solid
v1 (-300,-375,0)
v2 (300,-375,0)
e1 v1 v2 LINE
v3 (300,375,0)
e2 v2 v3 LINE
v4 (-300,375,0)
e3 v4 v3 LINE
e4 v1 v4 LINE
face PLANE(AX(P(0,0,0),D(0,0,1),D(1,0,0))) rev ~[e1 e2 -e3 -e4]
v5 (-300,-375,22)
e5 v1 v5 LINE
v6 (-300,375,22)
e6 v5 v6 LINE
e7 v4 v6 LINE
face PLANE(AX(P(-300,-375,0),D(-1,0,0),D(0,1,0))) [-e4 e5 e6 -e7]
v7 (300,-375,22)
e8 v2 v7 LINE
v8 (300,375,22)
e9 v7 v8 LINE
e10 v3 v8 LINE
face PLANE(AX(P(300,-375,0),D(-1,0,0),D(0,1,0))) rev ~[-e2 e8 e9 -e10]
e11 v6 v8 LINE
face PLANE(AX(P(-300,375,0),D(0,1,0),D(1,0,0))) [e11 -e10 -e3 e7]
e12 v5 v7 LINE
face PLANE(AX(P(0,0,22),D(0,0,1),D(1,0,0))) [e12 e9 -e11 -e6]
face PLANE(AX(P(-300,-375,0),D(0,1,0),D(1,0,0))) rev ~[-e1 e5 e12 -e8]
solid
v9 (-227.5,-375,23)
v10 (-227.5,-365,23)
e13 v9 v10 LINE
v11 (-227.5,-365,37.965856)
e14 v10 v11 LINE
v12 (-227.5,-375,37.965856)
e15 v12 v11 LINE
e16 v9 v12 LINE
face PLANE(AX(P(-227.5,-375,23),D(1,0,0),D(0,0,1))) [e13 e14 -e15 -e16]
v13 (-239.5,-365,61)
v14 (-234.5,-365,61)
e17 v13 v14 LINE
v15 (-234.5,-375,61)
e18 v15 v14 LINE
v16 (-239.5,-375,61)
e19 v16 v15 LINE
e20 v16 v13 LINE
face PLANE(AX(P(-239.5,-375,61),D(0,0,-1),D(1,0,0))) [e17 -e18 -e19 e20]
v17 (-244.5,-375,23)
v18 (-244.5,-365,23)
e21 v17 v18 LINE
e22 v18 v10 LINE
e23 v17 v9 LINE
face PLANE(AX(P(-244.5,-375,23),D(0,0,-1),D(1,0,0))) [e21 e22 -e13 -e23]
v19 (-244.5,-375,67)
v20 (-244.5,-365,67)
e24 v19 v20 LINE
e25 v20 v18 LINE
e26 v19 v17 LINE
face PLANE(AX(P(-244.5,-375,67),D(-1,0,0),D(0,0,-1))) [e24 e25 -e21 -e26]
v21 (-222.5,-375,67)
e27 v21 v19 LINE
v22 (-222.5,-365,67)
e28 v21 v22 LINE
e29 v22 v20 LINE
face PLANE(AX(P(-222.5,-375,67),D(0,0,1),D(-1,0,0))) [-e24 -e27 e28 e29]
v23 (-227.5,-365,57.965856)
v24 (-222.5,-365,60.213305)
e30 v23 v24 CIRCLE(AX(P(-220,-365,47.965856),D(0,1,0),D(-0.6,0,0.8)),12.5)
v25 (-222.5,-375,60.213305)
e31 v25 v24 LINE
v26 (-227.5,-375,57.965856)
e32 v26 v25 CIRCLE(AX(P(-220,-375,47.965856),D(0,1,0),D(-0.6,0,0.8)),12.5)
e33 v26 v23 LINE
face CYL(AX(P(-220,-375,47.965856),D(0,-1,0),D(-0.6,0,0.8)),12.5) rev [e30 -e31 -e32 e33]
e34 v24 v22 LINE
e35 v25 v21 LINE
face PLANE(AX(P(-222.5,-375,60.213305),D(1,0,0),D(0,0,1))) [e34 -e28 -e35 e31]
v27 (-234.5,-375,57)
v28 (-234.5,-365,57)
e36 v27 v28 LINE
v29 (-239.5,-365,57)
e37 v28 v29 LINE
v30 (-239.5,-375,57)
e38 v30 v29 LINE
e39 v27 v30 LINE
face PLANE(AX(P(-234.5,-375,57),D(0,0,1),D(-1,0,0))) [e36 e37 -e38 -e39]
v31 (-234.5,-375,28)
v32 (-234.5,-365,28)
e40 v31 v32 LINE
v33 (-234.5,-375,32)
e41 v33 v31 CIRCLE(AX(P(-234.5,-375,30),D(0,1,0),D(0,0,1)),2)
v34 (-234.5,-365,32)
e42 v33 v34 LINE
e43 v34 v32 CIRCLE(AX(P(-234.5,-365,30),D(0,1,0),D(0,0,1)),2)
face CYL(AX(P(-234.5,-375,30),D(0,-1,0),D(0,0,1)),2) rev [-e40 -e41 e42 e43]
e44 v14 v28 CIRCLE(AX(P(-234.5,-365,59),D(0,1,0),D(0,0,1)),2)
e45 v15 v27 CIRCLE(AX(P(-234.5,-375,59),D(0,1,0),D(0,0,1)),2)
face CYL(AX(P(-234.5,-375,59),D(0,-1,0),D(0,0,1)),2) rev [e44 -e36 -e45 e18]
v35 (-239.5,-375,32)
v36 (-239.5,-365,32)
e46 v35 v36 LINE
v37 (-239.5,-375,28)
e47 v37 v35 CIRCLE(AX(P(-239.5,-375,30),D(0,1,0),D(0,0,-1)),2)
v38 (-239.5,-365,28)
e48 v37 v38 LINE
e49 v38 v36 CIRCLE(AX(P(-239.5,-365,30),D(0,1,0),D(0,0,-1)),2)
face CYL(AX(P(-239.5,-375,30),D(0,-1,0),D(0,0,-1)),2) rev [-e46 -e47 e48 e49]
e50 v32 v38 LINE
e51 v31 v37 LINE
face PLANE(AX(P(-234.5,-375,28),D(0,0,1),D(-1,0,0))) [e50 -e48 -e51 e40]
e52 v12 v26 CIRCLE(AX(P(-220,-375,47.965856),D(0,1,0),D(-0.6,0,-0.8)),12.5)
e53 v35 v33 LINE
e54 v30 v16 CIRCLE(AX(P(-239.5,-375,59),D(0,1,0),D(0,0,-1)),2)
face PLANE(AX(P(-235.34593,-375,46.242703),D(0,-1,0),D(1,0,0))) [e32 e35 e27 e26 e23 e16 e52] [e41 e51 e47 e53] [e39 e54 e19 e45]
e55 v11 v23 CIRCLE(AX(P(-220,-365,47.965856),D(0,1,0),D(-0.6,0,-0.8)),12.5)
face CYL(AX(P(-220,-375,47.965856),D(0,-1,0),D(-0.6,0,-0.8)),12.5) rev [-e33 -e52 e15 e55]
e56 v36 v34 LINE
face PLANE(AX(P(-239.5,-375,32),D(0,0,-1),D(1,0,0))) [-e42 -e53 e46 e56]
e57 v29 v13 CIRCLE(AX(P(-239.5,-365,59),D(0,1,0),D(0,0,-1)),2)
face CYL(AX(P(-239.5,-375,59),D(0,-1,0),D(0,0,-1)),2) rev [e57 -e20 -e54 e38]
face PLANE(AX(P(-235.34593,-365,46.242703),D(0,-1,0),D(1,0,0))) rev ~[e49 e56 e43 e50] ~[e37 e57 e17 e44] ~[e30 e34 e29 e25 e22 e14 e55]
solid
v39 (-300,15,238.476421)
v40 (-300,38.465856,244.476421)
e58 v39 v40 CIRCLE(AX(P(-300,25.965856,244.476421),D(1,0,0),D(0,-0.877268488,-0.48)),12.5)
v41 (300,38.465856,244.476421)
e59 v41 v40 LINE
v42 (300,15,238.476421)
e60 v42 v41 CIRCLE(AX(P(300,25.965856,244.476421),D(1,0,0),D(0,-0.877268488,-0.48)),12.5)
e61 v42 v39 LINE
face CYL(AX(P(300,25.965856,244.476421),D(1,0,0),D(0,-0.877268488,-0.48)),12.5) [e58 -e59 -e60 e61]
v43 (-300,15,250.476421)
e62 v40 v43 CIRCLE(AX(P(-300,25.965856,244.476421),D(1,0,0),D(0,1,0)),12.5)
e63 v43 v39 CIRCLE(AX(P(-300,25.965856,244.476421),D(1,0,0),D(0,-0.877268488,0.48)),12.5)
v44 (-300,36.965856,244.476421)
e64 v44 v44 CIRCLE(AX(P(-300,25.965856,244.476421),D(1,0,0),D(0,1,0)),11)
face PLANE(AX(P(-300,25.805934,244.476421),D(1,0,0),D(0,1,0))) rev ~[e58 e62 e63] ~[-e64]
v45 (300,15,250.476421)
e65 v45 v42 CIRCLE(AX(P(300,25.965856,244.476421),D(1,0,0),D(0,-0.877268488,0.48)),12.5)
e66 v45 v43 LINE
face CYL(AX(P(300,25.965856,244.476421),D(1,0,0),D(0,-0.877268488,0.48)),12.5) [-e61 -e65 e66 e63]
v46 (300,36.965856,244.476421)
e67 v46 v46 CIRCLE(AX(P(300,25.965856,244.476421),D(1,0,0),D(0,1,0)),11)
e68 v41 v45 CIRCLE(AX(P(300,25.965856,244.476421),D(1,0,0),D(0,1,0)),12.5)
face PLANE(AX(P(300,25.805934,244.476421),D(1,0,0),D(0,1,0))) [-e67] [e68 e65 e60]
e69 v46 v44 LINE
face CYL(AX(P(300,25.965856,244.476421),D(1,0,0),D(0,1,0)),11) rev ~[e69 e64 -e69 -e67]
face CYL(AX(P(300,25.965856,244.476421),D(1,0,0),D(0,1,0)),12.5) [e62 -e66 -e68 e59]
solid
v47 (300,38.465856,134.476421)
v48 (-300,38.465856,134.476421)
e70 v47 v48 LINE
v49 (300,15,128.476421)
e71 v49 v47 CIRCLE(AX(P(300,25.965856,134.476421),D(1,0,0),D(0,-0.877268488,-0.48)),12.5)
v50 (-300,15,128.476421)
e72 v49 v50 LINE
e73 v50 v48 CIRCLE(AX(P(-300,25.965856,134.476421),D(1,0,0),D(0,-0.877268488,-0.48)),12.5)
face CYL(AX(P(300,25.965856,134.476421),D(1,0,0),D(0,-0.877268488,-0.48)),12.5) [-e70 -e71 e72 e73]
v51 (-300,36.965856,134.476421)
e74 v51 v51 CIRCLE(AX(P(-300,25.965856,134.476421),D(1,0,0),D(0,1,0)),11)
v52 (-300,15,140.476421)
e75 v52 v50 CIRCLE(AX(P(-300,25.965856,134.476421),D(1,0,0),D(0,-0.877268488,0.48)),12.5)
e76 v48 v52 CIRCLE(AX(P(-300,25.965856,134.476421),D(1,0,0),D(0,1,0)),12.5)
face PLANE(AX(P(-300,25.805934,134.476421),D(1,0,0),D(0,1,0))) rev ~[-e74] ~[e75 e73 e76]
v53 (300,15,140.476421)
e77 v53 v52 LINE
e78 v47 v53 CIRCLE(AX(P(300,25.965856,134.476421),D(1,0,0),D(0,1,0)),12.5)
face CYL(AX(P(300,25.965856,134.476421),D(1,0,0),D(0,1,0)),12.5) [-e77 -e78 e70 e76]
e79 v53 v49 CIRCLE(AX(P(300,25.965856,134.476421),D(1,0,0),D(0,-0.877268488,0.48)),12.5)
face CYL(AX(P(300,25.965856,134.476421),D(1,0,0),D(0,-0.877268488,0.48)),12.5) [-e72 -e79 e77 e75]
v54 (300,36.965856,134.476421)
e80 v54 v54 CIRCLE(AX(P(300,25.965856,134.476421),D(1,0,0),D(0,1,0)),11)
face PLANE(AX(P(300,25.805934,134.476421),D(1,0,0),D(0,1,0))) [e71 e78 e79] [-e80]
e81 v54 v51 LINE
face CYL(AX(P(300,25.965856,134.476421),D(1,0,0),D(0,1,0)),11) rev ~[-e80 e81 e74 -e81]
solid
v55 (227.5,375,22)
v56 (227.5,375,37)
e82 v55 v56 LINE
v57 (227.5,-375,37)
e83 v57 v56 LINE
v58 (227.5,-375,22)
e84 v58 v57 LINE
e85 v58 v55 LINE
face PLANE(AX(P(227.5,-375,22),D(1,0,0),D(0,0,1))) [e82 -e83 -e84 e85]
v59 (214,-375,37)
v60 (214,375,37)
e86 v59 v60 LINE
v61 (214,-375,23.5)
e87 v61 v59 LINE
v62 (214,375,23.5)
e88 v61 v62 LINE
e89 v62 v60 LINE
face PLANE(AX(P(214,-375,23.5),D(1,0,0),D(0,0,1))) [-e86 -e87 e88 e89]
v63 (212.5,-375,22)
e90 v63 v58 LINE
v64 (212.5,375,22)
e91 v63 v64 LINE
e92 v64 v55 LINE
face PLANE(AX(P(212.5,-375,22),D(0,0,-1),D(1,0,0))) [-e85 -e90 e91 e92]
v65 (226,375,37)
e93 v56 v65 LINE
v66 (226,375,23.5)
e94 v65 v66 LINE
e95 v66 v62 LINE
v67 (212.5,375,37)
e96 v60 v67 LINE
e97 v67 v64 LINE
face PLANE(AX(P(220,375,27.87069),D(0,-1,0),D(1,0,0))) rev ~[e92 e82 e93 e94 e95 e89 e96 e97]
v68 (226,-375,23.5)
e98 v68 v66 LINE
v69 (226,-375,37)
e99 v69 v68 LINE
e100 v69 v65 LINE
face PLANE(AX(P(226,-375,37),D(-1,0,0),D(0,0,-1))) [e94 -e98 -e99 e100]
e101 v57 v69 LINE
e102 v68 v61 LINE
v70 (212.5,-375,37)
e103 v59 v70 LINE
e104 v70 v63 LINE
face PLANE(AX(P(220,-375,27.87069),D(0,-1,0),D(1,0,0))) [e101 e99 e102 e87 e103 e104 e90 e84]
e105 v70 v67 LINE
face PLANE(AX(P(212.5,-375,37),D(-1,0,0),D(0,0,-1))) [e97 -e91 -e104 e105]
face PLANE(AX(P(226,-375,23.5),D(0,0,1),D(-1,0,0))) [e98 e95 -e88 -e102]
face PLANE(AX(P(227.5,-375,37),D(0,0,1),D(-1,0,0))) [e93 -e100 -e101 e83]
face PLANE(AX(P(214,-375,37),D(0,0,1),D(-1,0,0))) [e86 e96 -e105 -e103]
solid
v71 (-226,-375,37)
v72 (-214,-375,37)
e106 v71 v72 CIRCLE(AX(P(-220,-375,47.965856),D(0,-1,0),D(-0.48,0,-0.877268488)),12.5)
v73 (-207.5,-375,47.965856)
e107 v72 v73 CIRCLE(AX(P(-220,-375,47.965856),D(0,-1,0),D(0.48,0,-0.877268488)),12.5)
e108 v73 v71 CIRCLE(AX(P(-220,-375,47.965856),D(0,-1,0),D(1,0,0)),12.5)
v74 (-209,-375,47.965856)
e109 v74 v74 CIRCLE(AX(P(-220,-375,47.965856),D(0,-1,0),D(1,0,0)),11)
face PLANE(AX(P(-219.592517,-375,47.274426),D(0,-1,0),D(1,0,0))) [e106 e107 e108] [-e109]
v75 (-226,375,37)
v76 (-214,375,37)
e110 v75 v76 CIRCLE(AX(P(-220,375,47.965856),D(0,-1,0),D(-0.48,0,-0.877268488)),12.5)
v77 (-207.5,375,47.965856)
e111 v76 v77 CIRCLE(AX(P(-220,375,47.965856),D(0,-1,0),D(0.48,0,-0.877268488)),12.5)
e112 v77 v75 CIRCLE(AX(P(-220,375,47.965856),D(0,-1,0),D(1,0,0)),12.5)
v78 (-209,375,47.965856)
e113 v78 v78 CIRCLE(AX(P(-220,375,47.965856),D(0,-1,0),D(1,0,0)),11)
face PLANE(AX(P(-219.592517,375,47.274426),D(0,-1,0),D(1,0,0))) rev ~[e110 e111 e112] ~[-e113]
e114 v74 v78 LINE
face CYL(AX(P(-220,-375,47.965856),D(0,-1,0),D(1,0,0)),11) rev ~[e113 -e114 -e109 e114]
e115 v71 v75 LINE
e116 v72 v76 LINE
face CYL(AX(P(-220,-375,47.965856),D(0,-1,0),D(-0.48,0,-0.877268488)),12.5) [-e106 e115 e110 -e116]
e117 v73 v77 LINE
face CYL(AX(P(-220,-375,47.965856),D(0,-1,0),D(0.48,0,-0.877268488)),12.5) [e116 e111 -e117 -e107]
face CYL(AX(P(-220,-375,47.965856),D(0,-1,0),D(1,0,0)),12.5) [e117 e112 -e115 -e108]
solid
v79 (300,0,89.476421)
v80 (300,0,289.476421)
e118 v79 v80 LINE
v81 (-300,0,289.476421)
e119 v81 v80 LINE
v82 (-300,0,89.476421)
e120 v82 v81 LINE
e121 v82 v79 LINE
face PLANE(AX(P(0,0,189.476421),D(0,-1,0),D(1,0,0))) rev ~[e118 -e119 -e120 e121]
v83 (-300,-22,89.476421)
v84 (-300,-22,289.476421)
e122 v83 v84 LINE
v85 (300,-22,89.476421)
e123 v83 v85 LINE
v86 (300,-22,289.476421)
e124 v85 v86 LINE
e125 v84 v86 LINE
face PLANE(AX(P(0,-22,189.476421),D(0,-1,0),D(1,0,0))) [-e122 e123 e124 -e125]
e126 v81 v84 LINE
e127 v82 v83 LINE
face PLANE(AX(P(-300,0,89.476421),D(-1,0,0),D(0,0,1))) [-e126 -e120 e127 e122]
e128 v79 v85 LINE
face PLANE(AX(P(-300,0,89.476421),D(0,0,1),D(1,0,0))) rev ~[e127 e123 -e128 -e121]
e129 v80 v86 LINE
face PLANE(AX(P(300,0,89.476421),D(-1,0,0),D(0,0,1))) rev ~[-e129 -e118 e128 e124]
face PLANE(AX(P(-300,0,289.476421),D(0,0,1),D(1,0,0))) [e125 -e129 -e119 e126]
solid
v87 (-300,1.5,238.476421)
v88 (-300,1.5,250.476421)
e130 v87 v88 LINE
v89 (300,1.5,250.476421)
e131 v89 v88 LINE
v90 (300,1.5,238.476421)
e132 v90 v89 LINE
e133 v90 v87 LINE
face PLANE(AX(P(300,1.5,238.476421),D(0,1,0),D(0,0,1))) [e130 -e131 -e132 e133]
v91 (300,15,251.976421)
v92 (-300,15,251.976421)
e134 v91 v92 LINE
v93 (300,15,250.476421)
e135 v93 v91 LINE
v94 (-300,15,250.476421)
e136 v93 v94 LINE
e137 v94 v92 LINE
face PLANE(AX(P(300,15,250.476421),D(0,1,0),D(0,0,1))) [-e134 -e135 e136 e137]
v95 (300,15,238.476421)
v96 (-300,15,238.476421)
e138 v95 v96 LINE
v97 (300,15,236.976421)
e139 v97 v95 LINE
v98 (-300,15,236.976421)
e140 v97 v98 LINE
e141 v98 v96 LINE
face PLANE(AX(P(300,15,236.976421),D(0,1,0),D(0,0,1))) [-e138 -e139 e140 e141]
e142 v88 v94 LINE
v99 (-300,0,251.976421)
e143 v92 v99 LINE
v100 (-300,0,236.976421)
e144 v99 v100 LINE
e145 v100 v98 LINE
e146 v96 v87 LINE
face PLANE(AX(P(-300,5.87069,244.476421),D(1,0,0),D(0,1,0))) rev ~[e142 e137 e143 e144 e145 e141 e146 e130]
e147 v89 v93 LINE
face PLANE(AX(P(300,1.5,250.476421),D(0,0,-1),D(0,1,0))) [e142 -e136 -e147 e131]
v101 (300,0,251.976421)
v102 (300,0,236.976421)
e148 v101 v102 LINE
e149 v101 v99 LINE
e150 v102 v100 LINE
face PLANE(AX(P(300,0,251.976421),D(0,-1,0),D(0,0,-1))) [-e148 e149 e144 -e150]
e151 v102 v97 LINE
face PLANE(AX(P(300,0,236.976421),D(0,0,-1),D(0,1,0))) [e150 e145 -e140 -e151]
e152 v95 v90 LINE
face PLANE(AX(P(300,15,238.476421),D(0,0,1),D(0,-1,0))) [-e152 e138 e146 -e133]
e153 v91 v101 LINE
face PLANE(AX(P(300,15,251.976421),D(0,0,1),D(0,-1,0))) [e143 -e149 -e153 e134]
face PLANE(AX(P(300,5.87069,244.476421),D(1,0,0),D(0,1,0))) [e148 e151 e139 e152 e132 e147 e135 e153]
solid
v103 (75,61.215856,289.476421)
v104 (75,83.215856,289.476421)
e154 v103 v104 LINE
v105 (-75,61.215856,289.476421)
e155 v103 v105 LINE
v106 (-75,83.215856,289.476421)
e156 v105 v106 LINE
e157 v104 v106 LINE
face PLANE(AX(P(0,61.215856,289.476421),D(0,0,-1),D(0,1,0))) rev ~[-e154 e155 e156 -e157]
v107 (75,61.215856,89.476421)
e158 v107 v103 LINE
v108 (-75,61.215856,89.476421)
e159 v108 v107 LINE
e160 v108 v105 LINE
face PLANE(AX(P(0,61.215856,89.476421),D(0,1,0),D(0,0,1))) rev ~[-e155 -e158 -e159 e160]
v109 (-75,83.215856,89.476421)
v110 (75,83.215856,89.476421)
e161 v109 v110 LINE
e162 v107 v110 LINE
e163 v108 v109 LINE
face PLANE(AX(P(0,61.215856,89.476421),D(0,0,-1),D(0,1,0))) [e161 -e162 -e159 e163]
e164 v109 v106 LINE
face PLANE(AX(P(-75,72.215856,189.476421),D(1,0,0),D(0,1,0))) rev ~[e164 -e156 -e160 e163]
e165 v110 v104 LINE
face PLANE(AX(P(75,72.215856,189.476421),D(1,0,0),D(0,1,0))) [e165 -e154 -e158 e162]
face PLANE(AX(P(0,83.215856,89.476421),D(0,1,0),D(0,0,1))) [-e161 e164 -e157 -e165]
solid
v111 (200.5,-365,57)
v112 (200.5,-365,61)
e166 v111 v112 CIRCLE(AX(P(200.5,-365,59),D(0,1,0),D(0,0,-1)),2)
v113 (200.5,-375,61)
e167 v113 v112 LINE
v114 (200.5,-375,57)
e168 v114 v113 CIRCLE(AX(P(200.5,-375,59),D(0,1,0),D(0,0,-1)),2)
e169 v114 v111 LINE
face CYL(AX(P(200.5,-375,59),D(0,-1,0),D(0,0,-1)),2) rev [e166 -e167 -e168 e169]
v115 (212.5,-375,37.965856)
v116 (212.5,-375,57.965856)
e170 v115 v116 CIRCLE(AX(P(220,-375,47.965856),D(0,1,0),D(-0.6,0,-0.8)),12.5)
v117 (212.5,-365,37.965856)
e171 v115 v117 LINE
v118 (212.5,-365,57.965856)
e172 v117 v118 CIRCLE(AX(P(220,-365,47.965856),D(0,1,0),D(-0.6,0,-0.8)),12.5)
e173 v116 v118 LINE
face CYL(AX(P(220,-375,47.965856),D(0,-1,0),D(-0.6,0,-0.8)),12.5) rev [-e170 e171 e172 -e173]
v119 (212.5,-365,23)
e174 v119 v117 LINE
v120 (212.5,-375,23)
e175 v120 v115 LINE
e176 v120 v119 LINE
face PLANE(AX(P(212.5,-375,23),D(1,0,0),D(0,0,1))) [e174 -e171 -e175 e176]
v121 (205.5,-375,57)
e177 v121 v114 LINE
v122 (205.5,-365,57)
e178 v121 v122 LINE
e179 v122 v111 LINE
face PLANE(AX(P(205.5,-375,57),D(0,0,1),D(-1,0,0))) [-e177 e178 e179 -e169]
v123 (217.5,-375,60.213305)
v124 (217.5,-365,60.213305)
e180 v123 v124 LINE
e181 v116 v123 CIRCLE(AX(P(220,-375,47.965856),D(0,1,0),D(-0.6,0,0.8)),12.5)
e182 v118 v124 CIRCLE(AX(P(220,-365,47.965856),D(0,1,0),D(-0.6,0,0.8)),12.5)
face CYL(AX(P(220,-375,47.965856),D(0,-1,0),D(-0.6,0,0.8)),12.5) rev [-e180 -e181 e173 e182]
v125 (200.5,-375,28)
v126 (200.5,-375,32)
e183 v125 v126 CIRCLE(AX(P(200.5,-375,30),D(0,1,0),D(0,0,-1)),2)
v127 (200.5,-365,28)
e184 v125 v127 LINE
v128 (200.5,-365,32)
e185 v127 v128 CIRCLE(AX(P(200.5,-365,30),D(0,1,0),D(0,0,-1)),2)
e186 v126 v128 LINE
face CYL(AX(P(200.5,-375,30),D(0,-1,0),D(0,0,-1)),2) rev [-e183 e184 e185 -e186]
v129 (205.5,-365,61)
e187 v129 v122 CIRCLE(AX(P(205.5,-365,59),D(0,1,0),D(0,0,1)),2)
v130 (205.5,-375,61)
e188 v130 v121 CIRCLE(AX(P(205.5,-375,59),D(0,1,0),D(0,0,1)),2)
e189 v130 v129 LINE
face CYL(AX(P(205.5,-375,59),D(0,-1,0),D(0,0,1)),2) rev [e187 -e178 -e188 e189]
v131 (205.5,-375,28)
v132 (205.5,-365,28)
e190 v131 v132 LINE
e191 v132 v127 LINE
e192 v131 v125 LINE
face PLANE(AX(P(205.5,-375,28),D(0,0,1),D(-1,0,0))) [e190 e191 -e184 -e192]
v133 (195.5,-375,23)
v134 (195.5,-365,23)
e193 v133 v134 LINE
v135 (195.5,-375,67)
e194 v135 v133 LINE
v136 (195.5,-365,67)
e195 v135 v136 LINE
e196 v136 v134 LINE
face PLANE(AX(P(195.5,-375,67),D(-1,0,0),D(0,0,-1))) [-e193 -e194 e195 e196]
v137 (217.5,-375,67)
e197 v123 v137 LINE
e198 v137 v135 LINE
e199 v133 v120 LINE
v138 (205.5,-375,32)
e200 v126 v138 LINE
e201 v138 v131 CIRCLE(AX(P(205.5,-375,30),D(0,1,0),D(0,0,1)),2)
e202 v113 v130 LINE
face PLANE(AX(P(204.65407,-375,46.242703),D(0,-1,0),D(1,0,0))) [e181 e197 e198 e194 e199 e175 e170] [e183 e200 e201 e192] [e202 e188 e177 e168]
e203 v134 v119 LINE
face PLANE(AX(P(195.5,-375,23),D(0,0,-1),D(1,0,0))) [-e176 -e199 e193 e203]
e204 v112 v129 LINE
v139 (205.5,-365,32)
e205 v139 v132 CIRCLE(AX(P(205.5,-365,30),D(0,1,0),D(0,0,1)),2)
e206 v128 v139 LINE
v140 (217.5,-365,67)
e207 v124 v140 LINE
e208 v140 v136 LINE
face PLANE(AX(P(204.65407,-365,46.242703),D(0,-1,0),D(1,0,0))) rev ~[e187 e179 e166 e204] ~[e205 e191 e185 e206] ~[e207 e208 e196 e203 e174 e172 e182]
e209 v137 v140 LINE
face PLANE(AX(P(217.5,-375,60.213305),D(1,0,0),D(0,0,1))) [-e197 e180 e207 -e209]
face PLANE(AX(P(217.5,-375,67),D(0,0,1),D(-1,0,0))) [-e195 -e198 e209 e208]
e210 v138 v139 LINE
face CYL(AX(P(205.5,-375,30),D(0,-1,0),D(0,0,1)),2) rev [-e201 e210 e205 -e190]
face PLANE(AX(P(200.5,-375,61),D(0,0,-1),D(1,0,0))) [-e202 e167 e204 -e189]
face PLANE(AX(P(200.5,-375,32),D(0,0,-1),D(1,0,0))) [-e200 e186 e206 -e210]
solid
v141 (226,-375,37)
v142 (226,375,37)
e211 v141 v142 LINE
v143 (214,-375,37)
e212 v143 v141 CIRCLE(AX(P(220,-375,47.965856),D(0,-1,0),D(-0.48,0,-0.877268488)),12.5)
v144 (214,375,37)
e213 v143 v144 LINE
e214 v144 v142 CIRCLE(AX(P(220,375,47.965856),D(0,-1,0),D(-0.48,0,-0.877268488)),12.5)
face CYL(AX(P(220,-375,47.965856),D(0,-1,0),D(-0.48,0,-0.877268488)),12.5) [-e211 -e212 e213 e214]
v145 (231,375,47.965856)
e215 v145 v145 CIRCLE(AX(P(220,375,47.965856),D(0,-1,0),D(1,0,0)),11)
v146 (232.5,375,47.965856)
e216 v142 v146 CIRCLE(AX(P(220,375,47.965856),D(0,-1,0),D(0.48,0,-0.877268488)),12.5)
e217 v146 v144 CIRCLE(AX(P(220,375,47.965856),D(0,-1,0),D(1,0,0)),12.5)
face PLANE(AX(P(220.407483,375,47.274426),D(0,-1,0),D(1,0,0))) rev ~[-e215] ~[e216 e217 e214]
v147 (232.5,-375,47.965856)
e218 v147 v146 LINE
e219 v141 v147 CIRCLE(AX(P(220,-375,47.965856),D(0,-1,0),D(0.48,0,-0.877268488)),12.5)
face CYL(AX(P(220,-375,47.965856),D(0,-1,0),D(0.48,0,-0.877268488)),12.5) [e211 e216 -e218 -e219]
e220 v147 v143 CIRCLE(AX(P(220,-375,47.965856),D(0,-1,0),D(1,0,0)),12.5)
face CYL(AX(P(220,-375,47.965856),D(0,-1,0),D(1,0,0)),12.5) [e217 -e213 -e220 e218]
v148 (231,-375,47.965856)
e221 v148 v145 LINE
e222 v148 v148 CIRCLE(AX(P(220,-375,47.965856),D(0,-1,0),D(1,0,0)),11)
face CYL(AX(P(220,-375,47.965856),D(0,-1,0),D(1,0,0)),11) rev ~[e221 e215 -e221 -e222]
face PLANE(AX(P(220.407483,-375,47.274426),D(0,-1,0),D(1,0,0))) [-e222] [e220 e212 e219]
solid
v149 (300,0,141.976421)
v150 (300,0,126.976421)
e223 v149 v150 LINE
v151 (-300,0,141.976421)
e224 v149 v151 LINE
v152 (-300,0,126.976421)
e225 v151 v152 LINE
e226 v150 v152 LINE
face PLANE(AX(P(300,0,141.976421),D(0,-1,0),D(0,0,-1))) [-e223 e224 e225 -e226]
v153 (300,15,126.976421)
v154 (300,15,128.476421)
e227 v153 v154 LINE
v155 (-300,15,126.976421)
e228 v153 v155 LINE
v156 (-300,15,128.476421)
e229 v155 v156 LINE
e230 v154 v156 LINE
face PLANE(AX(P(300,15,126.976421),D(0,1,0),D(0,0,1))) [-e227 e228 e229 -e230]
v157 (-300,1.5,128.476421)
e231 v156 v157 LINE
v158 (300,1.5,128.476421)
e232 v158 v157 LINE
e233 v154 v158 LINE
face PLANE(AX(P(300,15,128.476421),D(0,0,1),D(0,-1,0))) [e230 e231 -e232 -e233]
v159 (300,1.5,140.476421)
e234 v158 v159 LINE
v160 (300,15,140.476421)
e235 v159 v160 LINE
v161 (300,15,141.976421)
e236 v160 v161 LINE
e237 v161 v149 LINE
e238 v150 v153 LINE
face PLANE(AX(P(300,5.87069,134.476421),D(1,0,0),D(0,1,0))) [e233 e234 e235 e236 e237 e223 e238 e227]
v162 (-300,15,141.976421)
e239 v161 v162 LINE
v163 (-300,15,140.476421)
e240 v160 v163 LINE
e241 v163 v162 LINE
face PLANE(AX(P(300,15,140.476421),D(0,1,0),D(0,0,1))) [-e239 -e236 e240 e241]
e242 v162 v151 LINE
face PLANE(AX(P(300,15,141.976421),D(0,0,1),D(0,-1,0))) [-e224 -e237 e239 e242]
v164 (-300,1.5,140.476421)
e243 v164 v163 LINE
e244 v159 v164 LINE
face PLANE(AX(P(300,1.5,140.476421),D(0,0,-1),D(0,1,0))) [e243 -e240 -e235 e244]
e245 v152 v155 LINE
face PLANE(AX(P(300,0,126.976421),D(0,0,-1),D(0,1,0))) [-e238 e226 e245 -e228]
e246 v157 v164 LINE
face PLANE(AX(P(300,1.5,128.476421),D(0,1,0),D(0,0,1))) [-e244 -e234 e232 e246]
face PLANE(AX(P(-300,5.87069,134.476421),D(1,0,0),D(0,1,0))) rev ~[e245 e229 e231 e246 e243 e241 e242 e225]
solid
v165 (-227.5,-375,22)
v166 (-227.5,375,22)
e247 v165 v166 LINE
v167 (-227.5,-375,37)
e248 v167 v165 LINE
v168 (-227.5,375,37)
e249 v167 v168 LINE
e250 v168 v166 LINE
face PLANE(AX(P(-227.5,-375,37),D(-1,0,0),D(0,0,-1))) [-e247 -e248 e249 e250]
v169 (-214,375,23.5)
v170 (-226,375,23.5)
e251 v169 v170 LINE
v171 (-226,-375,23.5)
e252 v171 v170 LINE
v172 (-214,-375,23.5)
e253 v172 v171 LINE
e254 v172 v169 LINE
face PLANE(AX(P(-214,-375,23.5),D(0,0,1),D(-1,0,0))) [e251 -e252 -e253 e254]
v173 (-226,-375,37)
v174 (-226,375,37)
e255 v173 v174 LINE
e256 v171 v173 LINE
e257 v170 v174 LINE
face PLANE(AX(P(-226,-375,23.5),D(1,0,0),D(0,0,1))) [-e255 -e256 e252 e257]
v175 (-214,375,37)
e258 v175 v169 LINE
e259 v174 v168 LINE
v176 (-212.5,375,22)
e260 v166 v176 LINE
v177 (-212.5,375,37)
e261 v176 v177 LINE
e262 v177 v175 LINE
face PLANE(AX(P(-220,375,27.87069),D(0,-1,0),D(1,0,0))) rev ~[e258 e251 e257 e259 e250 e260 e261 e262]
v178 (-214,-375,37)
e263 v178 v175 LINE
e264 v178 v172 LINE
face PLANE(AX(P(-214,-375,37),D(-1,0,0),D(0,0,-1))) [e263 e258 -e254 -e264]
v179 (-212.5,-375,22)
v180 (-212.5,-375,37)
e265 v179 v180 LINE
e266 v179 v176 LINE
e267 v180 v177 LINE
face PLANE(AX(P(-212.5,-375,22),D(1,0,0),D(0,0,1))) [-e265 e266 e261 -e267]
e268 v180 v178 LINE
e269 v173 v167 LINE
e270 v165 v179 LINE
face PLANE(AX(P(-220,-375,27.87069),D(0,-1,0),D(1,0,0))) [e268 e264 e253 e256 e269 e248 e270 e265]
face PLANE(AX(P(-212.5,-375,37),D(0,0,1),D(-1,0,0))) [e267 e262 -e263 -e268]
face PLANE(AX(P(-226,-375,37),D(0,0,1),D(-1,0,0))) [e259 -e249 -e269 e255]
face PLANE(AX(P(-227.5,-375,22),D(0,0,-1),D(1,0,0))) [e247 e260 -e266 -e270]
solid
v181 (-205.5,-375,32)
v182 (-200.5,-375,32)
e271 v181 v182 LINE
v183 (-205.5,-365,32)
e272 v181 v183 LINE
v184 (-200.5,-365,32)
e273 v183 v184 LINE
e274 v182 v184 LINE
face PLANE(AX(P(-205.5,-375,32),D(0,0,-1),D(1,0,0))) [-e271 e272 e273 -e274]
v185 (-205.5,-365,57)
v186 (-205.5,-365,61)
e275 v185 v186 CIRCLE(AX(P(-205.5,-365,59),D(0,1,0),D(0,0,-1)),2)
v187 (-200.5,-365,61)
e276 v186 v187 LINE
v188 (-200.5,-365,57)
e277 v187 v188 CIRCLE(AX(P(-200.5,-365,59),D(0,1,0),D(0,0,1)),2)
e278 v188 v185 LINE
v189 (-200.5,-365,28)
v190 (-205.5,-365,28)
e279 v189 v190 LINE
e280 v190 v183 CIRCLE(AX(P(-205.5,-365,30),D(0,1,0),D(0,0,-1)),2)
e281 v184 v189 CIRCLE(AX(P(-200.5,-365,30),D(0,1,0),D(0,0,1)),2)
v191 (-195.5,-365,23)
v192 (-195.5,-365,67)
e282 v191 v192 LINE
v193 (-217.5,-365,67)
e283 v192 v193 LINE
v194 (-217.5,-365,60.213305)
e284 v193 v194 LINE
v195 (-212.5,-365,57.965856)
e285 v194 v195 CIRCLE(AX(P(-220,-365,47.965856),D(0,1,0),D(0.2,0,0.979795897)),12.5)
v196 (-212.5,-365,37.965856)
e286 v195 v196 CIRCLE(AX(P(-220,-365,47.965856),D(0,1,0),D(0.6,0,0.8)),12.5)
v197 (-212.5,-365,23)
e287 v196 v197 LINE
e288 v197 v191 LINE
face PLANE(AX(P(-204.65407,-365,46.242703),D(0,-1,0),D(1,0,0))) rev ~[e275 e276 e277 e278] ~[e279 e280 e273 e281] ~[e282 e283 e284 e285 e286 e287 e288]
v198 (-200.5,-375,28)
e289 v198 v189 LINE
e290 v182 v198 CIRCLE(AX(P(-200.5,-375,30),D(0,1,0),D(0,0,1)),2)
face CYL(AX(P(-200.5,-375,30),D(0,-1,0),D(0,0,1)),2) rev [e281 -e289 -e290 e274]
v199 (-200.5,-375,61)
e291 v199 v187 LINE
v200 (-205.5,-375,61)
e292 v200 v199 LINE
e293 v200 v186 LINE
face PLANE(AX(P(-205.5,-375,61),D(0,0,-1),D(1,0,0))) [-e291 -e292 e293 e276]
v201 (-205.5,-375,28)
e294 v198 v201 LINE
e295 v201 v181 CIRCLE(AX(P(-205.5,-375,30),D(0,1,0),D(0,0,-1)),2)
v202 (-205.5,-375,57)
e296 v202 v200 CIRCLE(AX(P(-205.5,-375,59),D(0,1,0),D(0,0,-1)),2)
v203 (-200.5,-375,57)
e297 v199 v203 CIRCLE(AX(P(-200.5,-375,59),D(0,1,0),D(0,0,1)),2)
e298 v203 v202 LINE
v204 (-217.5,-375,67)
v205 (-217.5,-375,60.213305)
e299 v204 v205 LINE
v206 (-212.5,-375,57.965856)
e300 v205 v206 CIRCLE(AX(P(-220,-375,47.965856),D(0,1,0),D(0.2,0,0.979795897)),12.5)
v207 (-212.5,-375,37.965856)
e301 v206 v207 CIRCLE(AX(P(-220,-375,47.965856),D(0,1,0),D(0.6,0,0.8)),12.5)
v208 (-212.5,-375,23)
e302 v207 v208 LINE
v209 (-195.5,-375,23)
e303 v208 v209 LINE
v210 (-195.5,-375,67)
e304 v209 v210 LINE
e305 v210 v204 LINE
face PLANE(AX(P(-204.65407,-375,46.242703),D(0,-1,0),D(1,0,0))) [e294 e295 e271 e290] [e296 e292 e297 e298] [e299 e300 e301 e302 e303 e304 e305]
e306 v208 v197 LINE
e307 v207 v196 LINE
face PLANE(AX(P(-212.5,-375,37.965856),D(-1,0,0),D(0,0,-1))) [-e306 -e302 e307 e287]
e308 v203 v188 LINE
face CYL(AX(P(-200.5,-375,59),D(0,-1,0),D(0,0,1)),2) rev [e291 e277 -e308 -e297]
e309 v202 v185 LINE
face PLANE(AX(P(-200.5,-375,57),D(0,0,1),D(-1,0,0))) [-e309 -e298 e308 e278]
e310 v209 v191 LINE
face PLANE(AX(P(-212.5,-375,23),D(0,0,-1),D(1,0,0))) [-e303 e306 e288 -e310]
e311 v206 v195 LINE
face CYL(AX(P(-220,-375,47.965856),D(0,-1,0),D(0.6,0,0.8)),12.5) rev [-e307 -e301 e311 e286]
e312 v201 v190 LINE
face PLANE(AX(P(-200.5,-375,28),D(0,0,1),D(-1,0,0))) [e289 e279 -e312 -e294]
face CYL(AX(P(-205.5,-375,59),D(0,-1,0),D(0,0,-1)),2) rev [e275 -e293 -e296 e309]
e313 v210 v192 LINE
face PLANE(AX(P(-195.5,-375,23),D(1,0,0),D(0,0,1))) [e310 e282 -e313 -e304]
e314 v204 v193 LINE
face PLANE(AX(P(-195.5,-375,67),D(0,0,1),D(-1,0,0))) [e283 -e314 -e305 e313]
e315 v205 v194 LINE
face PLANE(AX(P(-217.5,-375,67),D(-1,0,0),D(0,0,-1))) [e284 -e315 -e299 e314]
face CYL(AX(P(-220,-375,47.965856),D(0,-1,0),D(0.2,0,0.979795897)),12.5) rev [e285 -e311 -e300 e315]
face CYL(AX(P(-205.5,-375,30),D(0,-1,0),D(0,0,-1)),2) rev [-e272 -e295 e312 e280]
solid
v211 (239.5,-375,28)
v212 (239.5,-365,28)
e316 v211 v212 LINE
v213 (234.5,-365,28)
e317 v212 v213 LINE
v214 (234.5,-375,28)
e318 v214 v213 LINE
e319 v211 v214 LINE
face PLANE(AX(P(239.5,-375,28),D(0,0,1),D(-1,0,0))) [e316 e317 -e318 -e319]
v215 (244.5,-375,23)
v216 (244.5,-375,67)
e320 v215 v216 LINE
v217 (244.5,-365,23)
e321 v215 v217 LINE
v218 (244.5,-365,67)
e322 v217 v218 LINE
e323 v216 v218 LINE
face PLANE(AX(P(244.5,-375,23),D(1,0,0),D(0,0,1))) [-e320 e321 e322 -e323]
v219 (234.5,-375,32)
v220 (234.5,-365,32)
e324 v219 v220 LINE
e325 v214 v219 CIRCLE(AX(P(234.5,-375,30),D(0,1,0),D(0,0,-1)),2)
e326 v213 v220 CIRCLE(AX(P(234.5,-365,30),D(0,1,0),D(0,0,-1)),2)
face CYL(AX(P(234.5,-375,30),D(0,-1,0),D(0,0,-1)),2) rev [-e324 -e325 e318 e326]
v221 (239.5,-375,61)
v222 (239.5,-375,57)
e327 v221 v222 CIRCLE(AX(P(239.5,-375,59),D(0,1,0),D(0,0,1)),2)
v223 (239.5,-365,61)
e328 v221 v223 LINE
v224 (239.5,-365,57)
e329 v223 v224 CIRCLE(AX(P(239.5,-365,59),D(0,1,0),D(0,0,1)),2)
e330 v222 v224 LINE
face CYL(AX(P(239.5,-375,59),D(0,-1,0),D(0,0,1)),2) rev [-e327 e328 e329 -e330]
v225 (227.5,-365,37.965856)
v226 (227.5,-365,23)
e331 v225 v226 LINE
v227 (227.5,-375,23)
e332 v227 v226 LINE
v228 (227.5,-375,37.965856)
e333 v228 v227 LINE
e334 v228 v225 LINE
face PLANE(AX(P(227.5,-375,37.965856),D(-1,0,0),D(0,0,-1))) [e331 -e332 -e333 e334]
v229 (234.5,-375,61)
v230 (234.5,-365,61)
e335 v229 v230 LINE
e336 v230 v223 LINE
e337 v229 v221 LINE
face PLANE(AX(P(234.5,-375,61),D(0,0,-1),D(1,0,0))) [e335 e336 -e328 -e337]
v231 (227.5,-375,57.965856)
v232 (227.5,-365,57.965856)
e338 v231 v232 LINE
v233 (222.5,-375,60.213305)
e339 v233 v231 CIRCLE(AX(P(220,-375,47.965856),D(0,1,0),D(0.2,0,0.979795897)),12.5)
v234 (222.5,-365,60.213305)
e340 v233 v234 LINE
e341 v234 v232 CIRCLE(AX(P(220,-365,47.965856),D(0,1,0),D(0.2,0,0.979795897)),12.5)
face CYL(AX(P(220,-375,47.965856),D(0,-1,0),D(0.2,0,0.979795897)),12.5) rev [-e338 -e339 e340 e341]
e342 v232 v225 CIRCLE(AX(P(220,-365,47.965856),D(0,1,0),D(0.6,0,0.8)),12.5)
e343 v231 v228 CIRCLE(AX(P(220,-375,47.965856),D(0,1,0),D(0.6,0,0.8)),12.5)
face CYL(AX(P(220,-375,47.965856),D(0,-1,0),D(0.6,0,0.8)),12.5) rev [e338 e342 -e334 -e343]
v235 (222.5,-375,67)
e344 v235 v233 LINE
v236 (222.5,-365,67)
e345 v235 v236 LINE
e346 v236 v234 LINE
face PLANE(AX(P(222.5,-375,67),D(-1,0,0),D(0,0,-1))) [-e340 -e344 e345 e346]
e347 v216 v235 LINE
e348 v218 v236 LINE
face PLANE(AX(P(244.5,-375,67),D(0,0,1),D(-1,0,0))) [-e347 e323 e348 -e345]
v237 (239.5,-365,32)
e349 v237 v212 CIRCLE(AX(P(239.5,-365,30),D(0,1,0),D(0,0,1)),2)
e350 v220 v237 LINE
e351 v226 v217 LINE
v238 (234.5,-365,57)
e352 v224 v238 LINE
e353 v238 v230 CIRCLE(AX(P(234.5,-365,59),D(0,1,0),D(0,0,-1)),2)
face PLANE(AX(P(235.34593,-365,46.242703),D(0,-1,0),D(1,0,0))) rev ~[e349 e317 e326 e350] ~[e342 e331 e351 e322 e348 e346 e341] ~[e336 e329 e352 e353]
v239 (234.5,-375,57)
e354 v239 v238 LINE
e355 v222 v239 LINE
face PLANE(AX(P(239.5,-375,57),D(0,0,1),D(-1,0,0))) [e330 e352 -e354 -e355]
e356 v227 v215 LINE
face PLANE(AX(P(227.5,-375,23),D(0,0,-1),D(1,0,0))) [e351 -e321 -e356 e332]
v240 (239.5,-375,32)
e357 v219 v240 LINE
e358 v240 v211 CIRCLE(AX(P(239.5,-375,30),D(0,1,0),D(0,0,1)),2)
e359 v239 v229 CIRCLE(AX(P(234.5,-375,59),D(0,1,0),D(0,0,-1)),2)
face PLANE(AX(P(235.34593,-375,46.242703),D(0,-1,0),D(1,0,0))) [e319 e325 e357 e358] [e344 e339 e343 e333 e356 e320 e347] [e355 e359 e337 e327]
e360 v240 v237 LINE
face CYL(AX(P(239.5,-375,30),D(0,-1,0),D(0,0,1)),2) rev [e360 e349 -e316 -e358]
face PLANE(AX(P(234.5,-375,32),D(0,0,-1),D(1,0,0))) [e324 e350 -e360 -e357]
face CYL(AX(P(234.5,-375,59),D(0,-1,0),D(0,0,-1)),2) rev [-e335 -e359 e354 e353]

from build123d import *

# Parameters (mm, degrees)
F0_W      = 600
F0_H      = 750
F1_DEPTH  = 22
F3_DEPTH  = 750
F2_R      = 11
F5_DEPTH  = 10
F6_W      = 600
F6_H      = 200
F7_DEPTH  = 22
F8_R      = 11
F9_DEPTH  = 600
F10_W     = 22
F10_H     = 200
F11_DEPTH = 75


with BuildPart() as f1:
    # F0 (on Top) → F1 (new body)
    with BuildSketch(Plane.XY):
        Rectangle(F0_W, F0_H)
    extrude(amount=F1_DEPTH)


with BuildPart() as f3:
    # F2 (on face) → F3 (new body, through all)
    with BuildSketch(Plane.XZ.offset(375)):
        Polygon((-226, 37), (-227.5, 37), (-227.5, 22), (-212.5, 22), (-212.5, 37), (-214, 37), (-214, 23.5), (-226, 23.5), align=None)
    extrude(amount=-F3_DEPTH)


with BuildPart() as f3b:
    # F2 (on face) → F3, piece 2 (new body, through all)
    with BuildSketch(Plane.XZ.offset(375)):
        with BuildLine():
            ThreePointArc((-207.5, 47.9658560997), (-226.373774392, 58.7187626835), (-226, 37))
            ThreePointArc((-226, 37), (-220, 35.4658560997), (-214, 37))
            ThreePointArc((-214, 37), (-209.2470934162, 41.5920817077), (-207.5, 47.9658560997))
        make_face()
        with Locations((-220, 47.9658560997)):
            Circle(F2_R, mode=Mode.SUBTRACT)
    extrude(amount=-F3_DEPTH)


with BuildPart() as f3c:
    # F2 (on face) → F3, piece 3 (new body, through all)
    with BuildSketch(Plane.XZ.offset(375)):
        Polygon((212.5, 37), (212.5, 22), (227.5, 22), (227.5, 37), (226, 37), (226, 23.5), (214, 23.5), (214, 37), align=None)
    extrude(amount=-F3_DEPTH)


with BuildPart() as f3d:
    # F2 (on face) → F3, piece 4 (new body, through all)
    with BuildSketch(Plane.XZ.offset(375)):
        with BuildLine():
            ThreePointArc((232.5, 47.9658560997), (213.626225608, 58.7187626835), (214, 37))
            ThreePointArc((214, 37), (220, 35.4658560997), (226, 37))
            ThreePointArc((226, 37), (230.7529065838, 41.5920817077), (232.5, 47.9658560997))
        make_face()
        with Locations((220, 47.9658560997)):
            Circle(F2_R, mode=Mode.SUBTRACT)
    extrude(amount=-F3_DEPTH)


with BuildPart() as f5:
    # F4 (on face) → F5 (new body)
    with BuildSketch(Plane.XZ.offset(375)):
        with BuildLine():
            ThreePointArc((-227.5, 57.9658560997), (-225.1247201319, 59.3670509305), (-222.5, 60.2133048136))
            Line((-222.5, 60.2133048136), (-222.5, 67))
            Line((-222.5, 67), (-244.5, 67))
            Line((-244.5, 67), (-244.5, 23))
            Line((-244.5, 23), (-227.5, 23))
            Line((-227.5, 23), (-227.5, 37))
            Line((-227.5, 37), (-227.5, 37.9658560997))
            ThreePointArc((-227.5, 37.9658560997), (-232.5, 47.9658560997), (-227.5, 57.9658560997))
        make_face()
        with BuildLine():
            Line((-234.5, 28), (-239.5, 28))
            ThreePointArc((-239.5, 28), (-241.5, 30), (-239.5, 32))
            Line((-239.5, 32), (-234.5, 32))
            ThreePointArc((-234.5, 32), (-232.5, 30), (-234.5, 28))
        make_face(mode=Mode.SUBTRACT)
        with BuildLine():
            ThreePointArc((-239.5, 57), (-241.5, 59), (-239.5, 61))
            Line((-239.5, 61), (-234.5, 61))
            ThreePointArc((-234.5, 61), (-232.5, 59), (-234.5, 57))
            Line((-234.5, 57), (-239.5, 57))
        make_face(mode=Mode.SUBTRACT)
    extrude(amount=-F5_DEPTH)


with BuildPart() as f5b:
    # F4 (on face) → F5, piece 2 (new body)
    with BuildSketch(Plane.XZ.offset(375)):
        with BuildLine():
            Line((-217.5, 67), (-217.5, 60.2133048136))
            ThreePointArc((-217.5, 60.2133048136), (-214.8752798681, 59.3670509305), (-212.5, 57.9658560997))
            ThreePointArc((-212.5, 57.9658560997), (-208.8196601125, 53.5560260435), (-207.5, 47.9658560997))
            ThreePointArc((-207.5, 47.9658560997), (-208.8196601125, 42.375686156), (-212.5, 37.9658560997))
            Line((-212.5, 37.9658560997), (-212.5, 37))
            Line((-212.5, 37), (-212.5, 23))
            Line((-212.5, 23), (-195.5, 23))
            Line((-195.5, 23), (-195.5, 67))
            Line((-195.5, 67), (-217.5, 67))
        make_face()
        with BuildLine():
            Line((-205.5, 32), (-200.5, 32))
            ThreePointArc((-200.5, 32), (-198.5, 30), (-200.5, 28))
            Line((-200.5, 28), (-205.5, 28))
            ThreePointArc((-205.5, 28), (-207.5, 30), (-205.5, 32))
        make_face(mode=Mode.SUBTRACT)
        with BuildLine():
            ThreePointArc((-200.5, 61), (-198.5, 59), (-200.5, 57))
            Line((-200.5, 57), (-205.5, 57))
            ThreePointArc((-205.5, 57), (-207.5, 59), (-205.5, 61))
            Line((-205.5, 61), (-200.5, 61))
        make_face(mode=Mode.SUBTRACT)
    extrude(amount=-F5_DEPTH)


with BuildPart() as f5c:
    # F4 (on face) → F5, piece 3 (new body)
    with BuildSketch(Plane.XZ.offset(375)):
        with BuildLine():
            Line((195.5, 67), (195.5, 23))
            Line((195.5, 23), (212.5, 23))
            Line((212.5, 23), (212.5, 37))
            Line((212.5, 37), (212.5, 37.9658560997))
            ThreePointArc((212.5, 37.9658560997), (207.5, 47.9658560997), (212.5, 57.9658560997))
            ThreePointArc((212.5, 57.9658560997), (214.8752798681, 59.3670509305), (217.5, 60.2133048136))
            Line((217.5, 60.2133048136), (217.5, 67))
            Line((217.5, 67), (195.5, 67))
        make_face()
        with BuildLine():
            Line((205.5, 28), (200.5, 28))
            ThreePointArc((200.5, 28), (198.5, 30), (200.5, 32))
            Line((200.5, 32), (205.5, 32))
            ThreePointArc((205.5, 32), (207.5, 30), (205.5, 28))
        make_face(mode=Mode.SUBTRACT)
        with BuildLine():
            ThreePointArc((200.5, 57), (198.5, 59), (200.5, 61))
            Line((200.5, 61), (205.5, 61))
            ThreePointArc((205.5, 61), (207.5, 59), (205.5, 57))
            Line((205.5, 57), (200.5, 57))
        make_face(mode=Mode.SUBTRACT)
    extrude(amount=-F5_DEPTH)


with BuildPart() as f5d:
    # F4 (on face) → F5, piece 4 (new body)
    with BuildSketch(Plane.XZ.offset(375)):
        with BuildLine():
            Line((227.5, 37), (227.5, 23))
            Line((227.5, 23), (244.5, 23))
            Line((244.5, 23), (244.5, 67))
            Line((244.5, 67), (222.5, 67))
            Line((222.5, 67), (222.5, 60.2133048136))
            ThreePointArc((222.5, 60.2133048136), (225.1247201319, 59.3670509305), (227.5, 57.9658560997))
            ThreePointArc((227.5, 57.9658560997), (231.1803398875, 53.5560260435), (232.5, 47.9658560997))
            ThreePointArc((232.5, 47.9658560997), (231.1803398875, 42.375686156), (227.5, 37.9658560997))
            Line((227.5, 37.9658560997), (227.5, 37))
        make_face()
        with BuildLine():
            ThreePointArc((239.5, 32), (241.5, 30), (239.5, 28))
            Line((239.5, 28), (234.5, 28))
            ThreePointArc((234.5, 28), (232.5, 30), (234.5, 32))
            Line((234.5, 32), (239.5, 32))
        make_face(mode=Mode.SUBTRACT)
        with BuildLine():
            Line((239.5, 57), (234.5, 57))
            ThreePointArc((234.5, 57), (232.5, 59), (234.5, 61))
            Line((234.5, 61), (239.5, 61))
            ThreePointArc((239.5, 61), (241.5, 59), (239.5, 57))
        make_face(mode=Mode.SUBTRACT)
    extrude(amount=-F5_DEPTH)


with BuildPart() as f7:
    # F6 (on Front) → F7 (new body)
    with BuildSketch(Plane.XZ):
        with Locations((0, 189.4764214754)):
            Rectangle(F6_W, F6_H)
    extrude(amount=F7_DEPTH)


with BuildPart() as f9:
    # F8 (on face) → F9 (new body, through all)
    with BuildSketch(Plane.YZ.offset(300)):
        with BuildLine():
            ThreePointArc((38.4658560997, 244.4764214754), (29.0623701683, 256.5868137326), (15, 250.4764214754))
            ThreePointArc((15, 250.4764214754), (13.4658560997, 244.4764214754), (15, 238.4764214754))
            ThreePointArc((15, 238.4764214754), (29.0623701683, 232.3660292182), (38.4658560997, 244.4764214754))
        make_face()
        with Locations((25.9658560997, 244.4764214754)):
            Circle(F8_R, mode=Mode.SUBTRACT)
    extrude(amount=-F9_DEPTH)


with BuildPart() as f9b:
    # F8 (on face) → F9, piece 2 (new body, through all)
    with BuildSketch(Plane.YZ.offset(300)):
        Polygon((0, 251.9764214754), (0, 244.4764214754), (0, 236.9764214754), (15, 236.9764214754), (15, 238.4764214754), (1.5, 238.4764214754), (1.5, 244.4764214754), (1.5, 250.4764214754), (15, 250.4764214754), (15, 251.9764214754), align=None)
    extrude(amount=-F9_DEPTH)


with BuildPart() as f9c:
    # F8 (on face) → F9, piece 3 (new body, through all)
    with BuildSketch(Plane.YZ.offset(300)):
        Polygon((15, 141.9764214754), (0, 141.9764214754), (0, 134.4764214754), (0, 126.9764214754), (15, 126.9764214754), (15, 128.4764214754), (1.5, 128.4764214754), (1.5, 134.4764214754), (1.5, 140.4764214754), (15, 140.4764214754), align=None)
    extrude(amount=-F9_DEPTH)


with BuildPart() as f9d:
    # F8 (on face) → F9, piece 4 (new body, through all)
    with BuildSketch(Plane.YZ.offset(300)):
        with BuildLine():
            ThreePointArc((38.4658560997, 134.4764214754), (29.0623701683, 146.5868137326), (15, 140.4764214754))
            ThreePointArc((15, 140.4764214754), (13.4658560997, 134.4764214754), (15, 128.4764214754))
            ThreePointArc((15, 128.4764214754), (29.0623701683, 122.3660292182), (38.4658560997, 134.4764214754))
        make_face()
        with Locations((25.9658560997, 134.4764214754)):
            Circle(F8_R, mode=Mode.SUBTRACT)
    extrude(amount=-F9_DEPTH)


with BuildPart() as f11:
    # F10 (on Right) → F11 (new body, symmetric)
    with BuildSketch(Plane.YZ):
        with Locations((72.2158560997, 189.4764214754)):
            Rectangle(F10_W, F10_H)
    extrude(amount=F11_DEPTH, both=True)


solid = Compound([f1.part, f3.part, f3b.part, f3c.part, f3d.part, f5.part, f5b.part, f5c.part, f5d.part, f7.part, f9.part, f9b.part, f9c.part, f9d.part, f11.part])
